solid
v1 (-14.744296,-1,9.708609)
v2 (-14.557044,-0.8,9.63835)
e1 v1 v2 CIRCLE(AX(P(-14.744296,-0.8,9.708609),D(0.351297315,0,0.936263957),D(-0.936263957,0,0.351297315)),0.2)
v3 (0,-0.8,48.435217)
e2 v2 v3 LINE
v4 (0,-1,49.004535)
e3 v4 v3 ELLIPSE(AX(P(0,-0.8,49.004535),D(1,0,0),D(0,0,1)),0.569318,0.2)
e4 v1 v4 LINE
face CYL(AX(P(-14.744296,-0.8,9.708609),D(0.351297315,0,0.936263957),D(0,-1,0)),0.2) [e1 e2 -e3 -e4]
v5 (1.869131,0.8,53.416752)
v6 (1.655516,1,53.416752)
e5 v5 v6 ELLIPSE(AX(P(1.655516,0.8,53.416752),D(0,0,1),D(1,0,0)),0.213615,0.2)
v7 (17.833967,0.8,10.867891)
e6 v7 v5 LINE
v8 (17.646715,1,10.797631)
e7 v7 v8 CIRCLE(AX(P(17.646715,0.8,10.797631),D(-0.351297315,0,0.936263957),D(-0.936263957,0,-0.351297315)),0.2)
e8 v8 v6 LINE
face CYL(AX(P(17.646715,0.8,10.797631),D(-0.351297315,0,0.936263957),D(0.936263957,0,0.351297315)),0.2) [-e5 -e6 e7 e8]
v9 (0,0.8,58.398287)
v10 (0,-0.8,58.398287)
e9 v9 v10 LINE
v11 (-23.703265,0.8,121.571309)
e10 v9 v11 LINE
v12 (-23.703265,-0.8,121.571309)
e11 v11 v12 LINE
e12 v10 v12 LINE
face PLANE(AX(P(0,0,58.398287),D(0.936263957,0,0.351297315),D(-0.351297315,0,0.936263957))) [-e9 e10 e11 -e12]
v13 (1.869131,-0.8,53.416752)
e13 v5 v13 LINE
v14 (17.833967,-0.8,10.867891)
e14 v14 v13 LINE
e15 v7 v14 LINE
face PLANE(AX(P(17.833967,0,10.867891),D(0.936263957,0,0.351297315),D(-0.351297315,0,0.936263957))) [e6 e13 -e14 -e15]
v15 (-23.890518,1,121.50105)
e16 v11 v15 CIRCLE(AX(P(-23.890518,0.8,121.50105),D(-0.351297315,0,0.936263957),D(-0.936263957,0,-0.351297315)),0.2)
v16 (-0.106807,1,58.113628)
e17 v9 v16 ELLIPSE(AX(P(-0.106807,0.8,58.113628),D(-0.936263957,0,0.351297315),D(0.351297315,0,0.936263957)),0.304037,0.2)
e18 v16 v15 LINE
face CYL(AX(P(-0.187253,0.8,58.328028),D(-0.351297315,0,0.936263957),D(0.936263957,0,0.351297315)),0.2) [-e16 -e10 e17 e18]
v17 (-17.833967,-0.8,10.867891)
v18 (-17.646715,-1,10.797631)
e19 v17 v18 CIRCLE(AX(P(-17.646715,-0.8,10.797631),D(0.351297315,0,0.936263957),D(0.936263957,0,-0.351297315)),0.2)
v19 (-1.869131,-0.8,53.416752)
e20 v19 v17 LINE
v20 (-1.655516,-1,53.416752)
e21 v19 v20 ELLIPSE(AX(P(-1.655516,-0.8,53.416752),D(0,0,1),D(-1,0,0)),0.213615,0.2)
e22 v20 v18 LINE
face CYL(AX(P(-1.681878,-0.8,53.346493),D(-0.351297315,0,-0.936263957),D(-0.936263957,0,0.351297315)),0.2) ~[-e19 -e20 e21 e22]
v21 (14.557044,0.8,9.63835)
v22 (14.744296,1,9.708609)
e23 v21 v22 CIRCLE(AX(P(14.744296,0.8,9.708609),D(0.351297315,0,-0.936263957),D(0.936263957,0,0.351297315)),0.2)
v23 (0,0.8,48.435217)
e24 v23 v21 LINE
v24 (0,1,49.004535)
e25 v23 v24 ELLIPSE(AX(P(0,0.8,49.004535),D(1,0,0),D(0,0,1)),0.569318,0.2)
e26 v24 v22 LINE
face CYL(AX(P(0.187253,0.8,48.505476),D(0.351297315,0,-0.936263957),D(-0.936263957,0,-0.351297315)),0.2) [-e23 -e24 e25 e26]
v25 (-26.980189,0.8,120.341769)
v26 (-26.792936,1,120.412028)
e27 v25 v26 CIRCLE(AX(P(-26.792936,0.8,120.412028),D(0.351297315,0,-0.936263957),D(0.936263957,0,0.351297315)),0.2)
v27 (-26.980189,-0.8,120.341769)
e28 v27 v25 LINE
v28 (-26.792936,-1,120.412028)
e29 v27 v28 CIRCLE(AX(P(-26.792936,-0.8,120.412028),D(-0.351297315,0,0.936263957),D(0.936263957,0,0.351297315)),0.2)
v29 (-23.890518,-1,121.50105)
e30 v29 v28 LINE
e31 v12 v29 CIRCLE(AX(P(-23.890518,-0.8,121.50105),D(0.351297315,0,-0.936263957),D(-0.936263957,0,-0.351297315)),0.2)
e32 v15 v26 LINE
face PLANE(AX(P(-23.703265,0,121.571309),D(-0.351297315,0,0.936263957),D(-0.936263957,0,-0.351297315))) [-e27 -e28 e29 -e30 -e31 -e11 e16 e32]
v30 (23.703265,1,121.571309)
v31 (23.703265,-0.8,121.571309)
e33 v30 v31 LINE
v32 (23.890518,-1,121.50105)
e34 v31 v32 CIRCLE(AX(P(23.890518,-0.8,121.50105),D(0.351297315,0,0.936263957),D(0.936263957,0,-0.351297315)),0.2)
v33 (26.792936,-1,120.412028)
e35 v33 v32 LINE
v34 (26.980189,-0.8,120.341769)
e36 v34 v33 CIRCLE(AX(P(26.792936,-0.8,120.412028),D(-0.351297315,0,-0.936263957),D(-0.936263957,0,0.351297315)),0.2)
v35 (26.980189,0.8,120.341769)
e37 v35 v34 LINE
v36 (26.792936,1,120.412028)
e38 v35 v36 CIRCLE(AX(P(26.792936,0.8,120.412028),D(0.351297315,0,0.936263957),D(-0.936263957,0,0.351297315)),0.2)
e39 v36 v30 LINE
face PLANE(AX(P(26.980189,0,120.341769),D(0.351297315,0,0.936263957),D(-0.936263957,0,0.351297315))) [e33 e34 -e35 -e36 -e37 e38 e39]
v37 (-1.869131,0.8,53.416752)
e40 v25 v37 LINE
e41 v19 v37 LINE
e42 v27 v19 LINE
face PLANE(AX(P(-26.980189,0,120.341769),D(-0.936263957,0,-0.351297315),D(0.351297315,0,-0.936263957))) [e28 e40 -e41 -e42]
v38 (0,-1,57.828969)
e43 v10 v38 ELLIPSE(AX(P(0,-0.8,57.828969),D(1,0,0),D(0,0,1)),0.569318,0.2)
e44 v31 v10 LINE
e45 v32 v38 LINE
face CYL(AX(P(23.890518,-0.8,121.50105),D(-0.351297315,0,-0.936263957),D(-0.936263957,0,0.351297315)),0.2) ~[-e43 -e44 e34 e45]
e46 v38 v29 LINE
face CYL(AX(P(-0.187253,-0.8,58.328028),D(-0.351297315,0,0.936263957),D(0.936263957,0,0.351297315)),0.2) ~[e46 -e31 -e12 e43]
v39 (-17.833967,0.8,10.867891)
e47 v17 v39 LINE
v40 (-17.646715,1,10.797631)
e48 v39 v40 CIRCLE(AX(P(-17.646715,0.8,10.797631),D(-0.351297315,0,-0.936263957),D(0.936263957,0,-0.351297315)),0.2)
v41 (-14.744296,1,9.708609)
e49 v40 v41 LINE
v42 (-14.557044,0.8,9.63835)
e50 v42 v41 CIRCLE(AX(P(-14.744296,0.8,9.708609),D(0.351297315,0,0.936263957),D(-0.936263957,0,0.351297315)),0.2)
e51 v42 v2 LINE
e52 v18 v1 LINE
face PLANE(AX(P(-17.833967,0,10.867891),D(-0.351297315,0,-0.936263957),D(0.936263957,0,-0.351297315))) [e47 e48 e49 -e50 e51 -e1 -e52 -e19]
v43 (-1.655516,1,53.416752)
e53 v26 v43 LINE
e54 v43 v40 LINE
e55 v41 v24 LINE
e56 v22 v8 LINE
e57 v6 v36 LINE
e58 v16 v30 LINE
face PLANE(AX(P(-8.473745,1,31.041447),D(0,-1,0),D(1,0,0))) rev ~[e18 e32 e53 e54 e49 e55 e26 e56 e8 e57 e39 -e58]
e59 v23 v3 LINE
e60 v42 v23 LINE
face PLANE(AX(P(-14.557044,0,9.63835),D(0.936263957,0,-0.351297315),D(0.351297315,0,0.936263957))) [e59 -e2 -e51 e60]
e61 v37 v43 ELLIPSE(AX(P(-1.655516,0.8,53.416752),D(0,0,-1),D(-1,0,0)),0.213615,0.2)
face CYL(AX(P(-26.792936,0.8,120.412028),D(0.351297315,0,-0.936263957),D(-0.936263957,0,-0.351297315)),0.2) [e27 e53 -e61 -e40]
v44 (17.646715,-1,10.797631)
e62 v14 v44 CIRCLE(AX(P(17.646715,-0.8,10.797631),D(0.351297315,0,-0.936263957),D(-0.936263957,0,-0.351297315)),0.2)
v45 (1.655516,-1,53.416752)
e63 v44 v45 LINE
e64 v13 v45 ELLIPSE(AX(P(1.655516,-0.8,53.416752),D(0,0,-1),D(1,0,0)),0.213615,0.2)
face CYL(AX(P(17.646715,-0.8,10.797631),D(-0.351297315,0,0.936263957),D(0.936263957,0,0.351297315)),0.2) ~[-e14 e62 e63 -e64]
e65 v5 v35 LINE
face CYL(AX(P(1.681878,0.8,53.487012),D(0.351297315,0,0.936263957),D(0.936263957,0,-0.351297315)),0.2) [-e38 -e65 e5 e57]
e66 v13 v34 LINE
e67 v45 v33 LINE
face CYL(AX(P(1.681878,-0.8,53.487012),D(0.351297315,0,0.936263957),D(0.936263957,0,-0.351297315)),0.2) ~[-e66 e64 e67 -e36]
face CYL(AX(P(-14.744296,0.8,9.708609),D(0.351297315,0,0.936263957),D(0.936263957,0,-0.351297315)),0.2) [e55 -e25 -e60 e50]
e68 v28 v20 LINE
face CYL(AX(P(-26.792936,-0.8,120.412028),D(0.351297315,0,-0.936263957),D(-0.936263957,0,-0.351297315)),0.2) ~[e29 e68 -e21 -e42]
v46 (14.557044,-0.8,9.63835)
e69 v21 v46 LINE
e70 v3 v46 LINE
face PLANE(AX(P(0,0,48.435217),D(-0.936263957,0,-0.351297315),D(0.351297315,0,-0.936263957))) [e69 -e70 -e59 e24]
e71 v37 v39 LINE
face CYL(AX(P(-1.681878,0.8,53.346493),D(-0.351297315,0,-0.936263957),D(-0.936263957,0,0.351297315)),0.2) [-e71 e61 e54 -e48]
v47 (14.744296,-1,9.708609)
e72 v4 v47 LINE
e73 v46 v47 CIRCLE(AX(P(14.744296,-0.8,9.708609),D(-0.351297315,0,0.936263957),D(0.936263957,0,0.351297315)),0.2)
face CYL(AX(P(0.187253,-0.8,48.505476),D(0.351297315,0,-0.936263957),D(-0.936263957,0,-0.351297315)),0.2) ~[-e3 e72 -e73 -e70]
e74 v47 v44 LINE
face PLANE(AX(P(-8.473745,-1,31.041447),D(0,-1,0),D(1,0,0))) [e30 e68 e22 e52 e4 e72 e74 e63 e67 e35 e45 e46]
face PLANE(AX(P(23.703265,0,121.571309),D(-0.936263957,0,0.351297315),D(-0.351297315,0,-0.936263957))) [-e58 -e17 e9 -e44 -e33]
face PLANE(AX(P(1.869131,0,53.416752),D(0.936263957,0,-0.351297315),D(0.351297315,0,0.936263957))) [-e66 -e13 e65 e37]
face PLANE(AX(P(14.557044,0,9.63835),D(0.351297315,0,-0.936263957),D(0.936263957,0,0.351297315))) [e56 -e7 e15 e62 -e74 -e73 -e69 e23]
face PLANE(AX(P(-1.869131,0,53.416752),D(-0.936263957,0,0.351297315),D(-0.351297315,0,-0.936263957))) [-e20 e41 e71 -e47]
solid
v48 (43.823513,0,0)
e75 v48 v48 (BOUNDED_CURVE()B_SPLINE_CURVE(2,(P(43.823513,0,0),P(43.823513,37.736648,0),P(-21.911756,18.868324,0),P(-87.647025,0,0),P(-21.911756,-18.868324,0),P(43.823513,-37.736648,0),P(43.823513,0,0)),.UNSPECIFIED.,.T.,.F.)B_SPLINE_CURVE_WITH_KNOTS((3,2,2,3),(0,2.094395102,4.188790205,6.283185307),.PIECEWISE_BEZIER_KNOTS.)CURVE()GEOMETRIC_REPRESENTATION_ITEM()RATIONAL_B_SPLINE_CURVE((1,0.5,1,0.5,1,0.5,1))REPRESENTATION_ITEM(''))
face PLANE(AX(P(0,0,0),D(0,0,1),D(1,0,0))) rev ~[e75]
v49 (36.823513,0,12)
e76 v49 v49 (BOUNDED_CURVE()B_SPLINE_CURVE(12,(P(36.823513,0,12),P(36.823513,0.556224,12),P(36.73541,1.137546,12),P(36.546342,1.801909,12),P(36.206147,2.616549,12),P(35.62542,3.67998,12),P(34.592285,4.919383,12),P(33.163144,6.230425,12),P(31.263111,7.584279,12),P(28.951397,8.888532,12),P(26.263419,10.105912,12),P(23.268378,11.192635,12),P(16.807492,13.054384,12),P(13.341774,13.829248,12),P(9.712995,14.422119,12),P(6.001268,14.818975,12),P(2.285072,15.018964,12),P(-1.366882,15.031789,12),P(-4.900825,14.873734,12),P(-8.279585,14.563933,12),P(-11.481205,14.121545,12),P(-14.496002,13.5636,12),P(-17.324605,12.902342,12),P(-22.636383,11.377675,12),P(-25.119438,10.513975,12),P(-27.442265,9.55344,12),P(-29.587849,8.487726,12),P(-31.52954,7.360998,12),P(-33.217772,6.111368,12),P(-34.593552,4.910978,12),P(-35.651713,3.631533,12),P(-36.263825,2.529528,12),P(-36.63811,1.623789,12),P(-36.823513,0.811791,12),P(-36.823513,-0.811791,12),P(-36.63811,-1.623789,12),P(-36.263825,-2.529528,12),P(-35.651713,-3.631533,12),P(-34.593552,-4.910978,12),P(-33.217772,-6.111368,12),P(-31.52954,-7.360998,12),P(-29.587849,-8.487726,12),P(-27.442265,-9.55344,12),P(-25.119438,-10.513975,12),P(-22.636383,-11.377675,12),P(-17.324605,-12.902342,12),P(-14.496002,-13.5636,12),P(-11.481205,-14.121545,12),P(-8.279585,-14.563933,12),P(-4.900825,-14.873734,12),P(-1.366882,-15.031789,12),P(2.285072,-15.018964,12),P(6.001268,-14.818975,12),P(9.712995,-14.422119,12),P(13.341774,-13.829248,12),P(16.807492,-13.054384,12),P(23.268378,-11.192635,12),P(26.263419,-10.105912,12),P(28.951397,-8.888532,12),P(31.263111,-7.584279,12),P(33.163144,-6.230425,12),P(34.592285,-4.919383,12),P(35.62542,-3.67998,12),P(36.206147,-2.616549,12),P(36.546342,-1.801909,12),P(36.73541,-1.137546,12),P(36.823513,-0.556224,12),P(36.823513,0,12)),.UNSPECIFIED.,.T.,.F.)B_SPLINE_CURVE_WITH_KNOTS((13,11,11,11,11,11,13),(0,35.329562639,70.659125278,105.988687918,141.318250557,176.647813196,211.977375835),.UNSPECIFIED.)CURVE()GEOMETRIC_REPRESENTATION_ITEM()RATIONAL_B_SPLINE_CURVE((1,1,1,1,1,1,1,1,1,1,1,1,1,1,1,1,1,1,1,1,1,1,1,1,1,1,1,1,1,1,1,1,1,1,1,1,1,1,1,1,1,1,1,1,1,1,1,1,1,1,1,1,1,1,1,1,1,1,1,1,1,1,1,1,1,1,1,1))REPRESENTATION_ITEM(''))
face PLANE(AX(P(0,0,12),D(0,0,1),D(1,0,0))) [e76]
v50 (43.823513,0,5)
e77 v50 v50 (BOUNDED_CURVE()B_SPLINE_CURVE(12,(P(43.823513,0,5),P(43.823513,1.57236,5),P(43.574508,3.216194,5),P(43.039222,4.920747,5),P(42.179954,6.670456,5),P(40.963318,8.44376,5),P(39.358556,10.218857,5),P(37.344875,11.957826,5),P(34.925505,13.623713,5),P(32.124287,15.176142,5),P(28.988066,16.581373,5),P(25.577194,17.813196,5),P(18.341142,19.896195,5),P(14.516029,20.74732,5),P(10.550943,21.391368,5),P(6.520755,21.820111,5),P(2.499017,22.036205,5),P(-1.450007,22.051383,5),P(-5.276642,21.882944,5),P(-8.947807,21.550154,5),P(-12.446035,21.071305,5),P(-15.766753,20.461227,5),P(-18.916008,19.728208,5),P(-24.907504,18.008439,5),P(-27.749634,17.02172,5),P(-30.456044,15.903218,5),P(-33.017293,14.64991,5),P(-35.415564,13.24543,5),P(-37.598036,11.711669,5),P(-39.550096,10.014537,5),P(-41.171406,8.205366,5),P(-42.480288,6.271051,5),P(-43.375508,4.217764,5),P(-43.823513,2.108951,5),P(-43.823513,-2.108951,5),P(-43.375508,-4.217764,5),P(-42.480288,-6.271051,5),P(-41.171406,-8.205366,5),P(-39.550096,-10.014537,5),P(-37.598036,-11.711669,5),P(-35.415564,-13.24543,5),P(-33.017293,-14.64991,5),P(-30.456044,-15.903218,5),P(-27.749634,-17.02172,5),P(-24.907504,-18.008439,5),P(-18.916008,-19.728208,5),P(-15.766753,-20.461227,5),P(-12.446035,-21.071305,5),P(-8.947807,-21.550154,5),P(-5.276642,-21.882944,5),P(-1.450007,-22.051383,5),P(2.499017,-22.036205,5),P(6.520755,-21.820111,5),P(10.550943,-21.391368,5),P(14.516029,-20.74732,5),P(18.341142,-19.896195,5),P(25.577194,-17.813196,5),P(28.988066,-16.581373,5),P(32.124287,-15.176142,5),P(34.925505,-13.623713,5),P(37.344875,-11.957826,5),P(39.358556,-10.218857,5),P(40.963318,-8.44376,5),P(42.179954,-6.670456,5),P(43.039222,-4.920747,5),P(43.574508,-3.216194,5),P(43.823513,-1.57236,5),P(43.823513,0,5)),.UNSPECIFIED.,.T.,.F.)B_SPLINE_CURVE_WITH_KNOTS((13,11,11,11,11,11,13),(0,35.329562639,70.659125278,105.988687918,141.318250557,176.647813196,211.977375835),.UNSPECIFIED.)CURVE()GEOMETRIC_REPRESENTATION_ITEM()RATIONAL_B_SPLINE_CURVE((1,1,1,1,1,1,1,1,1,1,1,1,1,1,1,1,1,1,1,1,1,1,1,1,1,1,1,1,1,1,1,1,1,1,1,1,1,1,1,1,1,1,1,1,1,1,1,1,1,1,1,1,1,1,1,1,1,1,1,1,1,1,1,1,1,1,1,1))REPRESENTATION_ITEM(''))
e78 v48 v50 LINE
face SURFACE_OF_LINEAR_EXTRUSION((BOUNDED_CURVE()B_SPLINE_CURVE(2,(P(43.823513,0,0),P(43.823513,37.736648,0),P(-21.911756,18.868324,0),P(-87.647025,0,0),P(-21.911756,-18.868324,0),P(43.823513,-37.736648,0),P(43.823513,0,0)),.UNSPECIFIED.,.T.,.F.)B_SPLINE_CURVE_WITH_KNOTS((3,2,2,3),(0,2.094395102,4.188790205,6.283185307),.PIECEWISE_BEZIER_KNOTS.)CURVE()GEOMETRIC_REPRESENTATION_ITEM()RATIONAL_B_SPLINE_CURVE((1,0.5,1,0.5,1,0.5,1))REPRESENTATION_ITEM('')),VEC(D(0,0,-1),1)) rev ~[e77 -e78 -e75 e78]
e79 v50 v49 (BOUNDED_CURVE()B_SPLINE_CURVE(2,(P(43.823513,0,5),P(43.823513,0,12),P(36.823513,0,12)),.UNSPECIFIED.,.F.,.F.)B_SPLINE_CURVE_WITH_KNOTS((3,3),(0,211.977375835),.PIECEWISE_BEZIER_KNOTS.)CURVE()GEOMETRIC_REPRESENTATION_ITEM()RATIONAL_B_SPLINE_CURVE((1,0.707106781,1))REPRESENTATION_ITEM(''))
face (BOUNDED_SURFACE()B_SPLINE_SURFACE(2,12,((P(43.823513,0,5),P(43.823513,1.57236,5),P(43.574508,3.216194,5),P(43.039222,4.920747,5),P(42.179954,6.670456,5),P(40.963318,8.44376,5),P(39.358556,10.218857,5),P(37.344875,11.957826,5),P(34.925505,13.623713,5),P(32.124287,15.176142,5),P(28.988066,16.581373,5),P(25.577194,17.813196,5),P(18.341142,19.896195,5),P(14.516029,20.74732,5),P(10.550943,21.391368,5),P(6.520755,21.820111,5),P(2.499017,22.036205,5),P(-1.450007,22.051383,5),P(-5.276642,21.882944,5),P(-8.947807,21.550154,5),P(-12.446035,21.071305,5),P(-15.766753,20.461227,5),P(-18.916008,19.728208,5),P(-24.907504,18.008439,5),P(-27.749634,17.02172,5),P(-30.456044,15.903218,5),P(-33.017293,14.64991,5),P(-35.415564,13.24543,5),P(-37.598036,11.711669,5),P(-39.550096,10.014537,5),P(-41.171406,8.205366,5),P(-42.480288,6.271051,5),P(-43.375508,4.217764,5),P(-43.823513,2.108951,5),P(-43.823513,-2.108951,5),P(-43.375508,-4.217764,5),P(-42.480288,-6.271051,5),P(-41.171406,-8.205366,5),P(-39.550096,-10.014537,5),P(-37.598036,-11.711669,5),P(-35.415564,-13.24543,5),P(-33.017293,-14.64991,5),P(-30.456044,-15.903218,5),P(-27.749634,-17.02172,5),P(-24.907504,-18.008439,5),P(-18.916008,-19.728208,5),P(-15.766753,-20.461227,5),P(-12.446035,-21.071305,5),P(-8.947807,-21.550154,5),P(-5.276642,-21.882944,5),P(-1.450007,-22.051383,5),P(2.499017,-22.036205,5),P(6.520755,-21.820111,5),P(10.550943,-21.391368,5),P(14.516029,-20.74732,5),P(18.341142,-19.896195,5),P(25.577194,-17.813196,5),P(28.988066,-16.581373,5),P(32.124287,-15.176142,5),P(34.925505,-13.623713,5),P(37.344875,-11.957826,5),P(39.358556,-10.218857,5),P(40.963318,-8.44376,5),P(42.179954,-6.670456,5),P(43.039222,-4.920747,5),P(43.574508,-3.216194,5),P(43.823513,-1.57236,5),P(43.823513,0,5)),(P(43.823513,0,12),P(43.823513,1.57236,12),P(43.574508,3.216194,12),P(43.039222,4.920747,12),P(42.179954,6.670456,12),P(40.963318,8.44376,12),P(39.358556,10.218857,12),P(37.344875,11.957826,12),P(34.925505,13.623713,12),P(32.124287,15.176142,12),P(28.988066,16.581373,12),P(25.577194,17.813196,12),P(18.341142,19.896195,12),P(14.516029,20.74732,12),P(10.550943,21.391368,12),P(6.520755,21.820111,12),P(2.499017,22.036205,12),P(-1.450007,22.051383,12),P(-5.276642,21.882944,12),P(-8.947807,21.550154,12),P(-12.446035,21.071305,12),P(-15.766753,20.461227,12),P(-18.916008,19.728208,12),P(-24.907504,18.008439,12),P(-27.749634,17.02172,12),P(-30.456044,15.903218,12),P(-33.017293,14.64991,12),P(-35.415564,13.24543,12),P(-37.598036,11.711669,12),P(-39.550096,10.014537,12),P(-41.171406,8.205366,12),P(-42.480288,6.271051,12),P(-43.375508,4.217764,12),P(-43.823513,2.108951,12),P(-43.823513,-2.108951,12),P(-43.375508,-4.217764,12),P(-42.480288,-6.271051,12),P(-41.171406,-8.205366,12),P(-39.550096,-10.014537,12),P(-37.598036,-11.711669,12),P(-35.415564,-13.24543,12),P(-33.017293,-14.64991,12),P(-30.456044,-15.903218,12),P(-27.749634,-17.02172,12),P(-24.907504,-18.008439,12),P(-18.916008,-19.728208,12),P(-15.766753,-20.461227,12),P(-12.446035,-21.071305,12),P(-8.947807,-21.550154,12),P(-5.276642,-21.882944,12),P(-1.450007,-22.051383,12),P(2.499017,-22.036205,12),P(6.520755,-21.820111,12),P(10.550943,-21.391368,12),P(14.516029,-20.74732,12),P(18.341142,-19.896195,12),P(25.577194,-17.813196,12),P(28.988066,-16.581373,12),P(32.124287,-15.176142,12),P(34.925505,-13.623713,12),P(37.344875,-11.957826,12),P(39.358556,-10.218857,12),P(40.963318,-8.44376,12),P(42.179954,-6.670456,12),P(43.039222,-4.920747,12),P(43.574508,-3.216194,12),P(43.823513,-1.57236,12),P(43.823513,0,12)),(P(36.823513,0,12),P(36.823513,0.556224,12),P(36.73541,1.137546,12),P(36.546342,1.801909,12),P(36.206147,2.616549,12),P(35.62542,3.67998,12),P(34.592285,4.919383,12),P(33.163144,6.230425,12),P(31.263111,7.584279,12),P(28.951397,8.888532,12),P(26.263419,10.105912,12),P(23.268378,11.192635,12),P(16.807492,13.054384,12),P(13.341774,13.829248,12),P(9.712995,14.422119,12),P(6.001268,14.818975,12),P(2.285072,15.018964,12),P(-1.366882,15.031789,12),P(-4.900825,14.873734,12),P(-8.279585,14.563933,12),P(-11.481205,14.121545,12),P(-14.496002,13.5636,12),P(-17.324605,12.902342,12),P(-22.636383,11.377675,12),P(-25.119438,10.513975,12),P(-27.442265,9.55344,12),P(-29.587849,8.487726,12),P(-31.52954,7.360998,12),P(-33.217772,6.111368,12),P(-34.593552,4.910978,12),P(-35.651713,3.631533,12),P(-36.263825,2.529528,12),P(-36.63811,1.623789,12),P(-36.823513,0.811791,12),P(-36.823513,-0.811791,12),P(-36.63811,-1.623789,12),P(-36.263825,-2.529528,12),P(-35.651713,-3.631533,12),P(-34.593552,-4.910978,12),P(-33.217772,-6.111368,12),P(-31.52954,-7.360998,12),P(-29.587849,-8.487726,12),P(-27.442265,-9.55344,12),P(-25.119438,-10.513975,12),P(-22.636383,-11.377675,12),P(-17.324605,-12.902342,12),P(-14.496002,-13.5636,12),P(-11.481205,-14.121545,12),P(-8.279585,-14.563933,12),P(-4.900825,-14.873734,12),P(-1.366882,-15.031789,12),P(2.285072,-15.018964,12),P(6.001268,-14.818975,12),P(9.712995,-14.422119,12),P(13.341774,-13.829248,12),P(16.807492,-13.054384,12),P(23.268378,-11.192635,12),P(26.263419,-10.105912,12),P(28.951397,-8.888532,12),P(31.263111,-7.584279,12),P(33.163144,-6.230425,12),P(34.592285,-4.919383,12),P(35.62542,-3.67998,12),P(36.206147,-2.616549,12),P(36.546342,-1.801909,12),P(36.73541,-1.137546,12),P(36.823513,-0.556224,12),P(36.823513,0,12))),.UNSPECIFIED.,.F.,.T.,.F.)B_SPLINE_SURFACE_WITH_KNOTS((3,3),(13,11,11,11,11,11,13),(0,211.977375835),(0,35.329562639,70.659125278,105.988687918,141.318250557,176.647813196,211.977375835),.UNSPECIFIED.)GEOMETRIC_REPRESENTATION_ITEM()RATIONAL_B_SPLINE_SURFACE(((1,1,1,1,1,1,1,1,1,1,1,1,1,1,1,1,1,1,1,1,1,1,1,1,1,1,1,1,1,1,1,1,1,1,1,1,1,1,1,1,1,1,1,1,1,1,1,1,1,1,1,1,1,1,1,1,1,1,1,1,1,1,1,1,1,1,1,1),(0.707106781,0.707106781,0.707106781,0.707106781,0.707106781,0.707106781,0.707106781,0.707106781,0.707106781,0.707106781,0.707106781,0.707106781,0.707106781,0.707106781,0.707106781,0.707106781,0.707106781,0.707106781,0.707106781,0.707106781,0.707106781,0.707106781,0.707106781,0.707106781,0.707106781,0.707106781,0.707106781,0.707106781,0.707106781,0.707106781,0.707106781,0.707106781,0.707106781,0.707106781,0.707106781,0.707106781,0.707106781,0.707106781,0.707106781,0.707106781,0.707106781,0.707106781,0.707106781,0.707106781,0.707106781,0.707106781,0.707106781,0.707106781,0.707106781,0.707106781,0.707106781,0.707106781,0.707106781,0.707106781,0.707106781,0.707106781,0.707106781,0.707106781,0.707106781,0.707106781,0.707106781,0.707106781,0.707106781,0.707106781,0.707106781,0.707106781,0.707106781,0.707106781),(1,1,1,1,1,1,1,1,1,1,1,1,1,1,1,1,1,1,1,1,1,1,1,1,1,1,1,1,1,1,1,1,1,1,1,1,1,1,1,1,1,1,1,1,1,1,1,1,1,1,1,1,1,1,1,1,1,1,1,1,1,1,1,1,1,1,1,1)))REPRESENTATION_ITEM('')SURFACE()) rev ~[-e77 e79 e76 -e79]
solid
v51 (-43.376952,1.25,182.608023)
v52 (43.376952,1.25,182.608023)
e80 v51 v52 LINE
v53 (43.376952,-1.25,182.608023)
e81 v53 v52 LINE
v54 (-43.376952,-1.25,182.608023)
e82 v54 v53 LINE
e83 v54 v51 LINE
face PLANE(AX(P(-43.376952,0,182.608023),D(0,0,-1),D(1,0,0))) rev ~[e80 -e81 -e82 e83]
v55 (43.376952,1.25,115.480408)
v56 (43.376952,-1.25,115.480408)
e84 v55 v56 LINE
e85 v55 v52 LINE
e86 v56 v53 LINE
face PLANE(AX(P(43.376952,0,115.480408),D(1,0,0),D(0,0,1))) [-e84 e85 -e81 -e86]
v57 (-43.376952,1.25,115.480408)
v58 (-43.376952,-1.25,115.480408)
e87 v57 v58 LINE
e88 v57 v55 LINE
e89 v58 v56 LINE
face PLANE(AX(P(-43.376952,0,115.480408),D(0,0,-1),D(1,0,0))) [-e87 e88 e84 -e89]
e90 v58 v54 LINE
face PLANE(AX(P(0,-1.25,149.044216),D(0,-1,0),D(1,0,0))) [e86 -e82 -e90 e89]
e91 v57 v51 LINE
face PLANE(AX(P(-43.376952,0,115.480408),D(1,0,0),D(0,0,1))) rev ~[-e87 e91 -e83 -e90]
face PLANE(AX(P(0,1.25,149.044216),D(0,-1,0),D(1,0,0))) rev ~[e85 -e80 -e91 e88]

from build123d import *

# Parameters (mm, degrees)
F2_DEPTH      = 12
F1_W          = 86.7539048195
F1_H          = 67.1276152134
F3_DEPTH      = 1.25
F3_DEPTH_BACK = 1.25
F5_DEPTH      = 1
F5_DEPTH_BACK = 1
F6_R          = 7
F7_R          = 0.2


with BuildPart() as f2:
    # F0 (on Top) → F2 (new body)
    with BuildSketch(Plane.XY):
        with BuildLine():
            add(Edge.make_bspline(
                [(43.8235126286, 0), (43.8235126286, 37.7366478253), (-21.9117563143, 18.8683239126), (-87.6470252571, 0), (-21.9117563143, -18.8683239126), (43.8235126286, -37.7366478253), (43.8235126286, 0)],
                knots=[0, 0, 0, 2.0943951024, 2.0943951024, 4.1887902048, 4.1887902048, 6.2831853072, 6.2831853072, 6.2831853072], degree=2, weights=[1, 0.5, 1, 0.5, 1, 0.5, 1]))
        make_face()
    extrude(amount=F2_DEPTH)

    # F6
    f6_edges = [f2.edges().sort_by_distance(p)[0] for p in [
        (-43.823513, 6e-06, 12),
    ]]
    fillet(f6_edges, radius=F6_R)


with BuildPart() as f3:
    # F1 (on Front) → F3 (new body, two sides)
    with BuildSketch(Plane.XZ) as f3_sk:
        with Locations((0, 149.0442156792)):
            Rectangle(F1_W, F1_H)
    extrude(amount=F3_DEPTH)
    extrude(f3_sk.sketch, amount=-F3_DEPTH_BACK)


with BuildPart() as f5:
    # F4 (on Front) → F5 (new body, two sides)
    with BuildSketch(Plane.XZ) as f5_sk:
        Polygon((-17.833967352, 10.8678905179), (-14.5570435037, 9.6383499157), (0, 48.4352167556), (-1.8691310154, 53.4167521266), align=None)
        Polygon((-1.8691310154, 53.4167521266), (0, 48.4352167556), (1.8691310154, 53.4167521266), (0, 58.3982874977), align=None)
        Polygon((1.8691310154, 53.4167521266), (0, 48.4352167556), (14.5570435037, 9.6383499157), (17.833967352, 10.8678905179), align=None)
        Polygon((0, 58.3982874977), (1.8691310154, 53.4167521266), (26.9801891933, 120.3417688783), (23.703265345, 121.5713094805), align=None)
        Polygon((-26.9801891933, 120.3417688783), (-1.8691310154, 53.4167521266), (0, 58.3982874977), (-23.703265345, 121.5713094805), align=None)
    extrude(amount=F5_DEPTH)
    extrude(f5_sk.sketch, amount=-F5_DEPTH_BACK)

    # F7
    f7_edges = [f5.edges().sort_by_distance(p)[0] for p in [
        (-11.851633, -1, 89.984798),
        (-11.851633, 1, 89.984798),
        (14.42466, -1, 86.879261),
        (11.851633, -1, 89.984798),
        (14.42466, 1, 86.879261),
        (9.851549, -1, 32.142321),
        (9.851549, 1, 32.142321),
        (-7.278522, -1, 29.036783),
        (-7.278522, 1, 29.036783),
        (-9.851549, -1, 32.142321),
        (-14.42466, -1, 86.879261),
        (-9.851549, 1, 32.142321),
        (-14.42466, 1, 86.879261),
        (7.278522, 1, 29.036783),
        (7.278522, -1, 29.036783),
    ]]
    fillet(f7_edges, radius=F7_R)


solid = Compound([f2.part, f3.part, f5.part])
